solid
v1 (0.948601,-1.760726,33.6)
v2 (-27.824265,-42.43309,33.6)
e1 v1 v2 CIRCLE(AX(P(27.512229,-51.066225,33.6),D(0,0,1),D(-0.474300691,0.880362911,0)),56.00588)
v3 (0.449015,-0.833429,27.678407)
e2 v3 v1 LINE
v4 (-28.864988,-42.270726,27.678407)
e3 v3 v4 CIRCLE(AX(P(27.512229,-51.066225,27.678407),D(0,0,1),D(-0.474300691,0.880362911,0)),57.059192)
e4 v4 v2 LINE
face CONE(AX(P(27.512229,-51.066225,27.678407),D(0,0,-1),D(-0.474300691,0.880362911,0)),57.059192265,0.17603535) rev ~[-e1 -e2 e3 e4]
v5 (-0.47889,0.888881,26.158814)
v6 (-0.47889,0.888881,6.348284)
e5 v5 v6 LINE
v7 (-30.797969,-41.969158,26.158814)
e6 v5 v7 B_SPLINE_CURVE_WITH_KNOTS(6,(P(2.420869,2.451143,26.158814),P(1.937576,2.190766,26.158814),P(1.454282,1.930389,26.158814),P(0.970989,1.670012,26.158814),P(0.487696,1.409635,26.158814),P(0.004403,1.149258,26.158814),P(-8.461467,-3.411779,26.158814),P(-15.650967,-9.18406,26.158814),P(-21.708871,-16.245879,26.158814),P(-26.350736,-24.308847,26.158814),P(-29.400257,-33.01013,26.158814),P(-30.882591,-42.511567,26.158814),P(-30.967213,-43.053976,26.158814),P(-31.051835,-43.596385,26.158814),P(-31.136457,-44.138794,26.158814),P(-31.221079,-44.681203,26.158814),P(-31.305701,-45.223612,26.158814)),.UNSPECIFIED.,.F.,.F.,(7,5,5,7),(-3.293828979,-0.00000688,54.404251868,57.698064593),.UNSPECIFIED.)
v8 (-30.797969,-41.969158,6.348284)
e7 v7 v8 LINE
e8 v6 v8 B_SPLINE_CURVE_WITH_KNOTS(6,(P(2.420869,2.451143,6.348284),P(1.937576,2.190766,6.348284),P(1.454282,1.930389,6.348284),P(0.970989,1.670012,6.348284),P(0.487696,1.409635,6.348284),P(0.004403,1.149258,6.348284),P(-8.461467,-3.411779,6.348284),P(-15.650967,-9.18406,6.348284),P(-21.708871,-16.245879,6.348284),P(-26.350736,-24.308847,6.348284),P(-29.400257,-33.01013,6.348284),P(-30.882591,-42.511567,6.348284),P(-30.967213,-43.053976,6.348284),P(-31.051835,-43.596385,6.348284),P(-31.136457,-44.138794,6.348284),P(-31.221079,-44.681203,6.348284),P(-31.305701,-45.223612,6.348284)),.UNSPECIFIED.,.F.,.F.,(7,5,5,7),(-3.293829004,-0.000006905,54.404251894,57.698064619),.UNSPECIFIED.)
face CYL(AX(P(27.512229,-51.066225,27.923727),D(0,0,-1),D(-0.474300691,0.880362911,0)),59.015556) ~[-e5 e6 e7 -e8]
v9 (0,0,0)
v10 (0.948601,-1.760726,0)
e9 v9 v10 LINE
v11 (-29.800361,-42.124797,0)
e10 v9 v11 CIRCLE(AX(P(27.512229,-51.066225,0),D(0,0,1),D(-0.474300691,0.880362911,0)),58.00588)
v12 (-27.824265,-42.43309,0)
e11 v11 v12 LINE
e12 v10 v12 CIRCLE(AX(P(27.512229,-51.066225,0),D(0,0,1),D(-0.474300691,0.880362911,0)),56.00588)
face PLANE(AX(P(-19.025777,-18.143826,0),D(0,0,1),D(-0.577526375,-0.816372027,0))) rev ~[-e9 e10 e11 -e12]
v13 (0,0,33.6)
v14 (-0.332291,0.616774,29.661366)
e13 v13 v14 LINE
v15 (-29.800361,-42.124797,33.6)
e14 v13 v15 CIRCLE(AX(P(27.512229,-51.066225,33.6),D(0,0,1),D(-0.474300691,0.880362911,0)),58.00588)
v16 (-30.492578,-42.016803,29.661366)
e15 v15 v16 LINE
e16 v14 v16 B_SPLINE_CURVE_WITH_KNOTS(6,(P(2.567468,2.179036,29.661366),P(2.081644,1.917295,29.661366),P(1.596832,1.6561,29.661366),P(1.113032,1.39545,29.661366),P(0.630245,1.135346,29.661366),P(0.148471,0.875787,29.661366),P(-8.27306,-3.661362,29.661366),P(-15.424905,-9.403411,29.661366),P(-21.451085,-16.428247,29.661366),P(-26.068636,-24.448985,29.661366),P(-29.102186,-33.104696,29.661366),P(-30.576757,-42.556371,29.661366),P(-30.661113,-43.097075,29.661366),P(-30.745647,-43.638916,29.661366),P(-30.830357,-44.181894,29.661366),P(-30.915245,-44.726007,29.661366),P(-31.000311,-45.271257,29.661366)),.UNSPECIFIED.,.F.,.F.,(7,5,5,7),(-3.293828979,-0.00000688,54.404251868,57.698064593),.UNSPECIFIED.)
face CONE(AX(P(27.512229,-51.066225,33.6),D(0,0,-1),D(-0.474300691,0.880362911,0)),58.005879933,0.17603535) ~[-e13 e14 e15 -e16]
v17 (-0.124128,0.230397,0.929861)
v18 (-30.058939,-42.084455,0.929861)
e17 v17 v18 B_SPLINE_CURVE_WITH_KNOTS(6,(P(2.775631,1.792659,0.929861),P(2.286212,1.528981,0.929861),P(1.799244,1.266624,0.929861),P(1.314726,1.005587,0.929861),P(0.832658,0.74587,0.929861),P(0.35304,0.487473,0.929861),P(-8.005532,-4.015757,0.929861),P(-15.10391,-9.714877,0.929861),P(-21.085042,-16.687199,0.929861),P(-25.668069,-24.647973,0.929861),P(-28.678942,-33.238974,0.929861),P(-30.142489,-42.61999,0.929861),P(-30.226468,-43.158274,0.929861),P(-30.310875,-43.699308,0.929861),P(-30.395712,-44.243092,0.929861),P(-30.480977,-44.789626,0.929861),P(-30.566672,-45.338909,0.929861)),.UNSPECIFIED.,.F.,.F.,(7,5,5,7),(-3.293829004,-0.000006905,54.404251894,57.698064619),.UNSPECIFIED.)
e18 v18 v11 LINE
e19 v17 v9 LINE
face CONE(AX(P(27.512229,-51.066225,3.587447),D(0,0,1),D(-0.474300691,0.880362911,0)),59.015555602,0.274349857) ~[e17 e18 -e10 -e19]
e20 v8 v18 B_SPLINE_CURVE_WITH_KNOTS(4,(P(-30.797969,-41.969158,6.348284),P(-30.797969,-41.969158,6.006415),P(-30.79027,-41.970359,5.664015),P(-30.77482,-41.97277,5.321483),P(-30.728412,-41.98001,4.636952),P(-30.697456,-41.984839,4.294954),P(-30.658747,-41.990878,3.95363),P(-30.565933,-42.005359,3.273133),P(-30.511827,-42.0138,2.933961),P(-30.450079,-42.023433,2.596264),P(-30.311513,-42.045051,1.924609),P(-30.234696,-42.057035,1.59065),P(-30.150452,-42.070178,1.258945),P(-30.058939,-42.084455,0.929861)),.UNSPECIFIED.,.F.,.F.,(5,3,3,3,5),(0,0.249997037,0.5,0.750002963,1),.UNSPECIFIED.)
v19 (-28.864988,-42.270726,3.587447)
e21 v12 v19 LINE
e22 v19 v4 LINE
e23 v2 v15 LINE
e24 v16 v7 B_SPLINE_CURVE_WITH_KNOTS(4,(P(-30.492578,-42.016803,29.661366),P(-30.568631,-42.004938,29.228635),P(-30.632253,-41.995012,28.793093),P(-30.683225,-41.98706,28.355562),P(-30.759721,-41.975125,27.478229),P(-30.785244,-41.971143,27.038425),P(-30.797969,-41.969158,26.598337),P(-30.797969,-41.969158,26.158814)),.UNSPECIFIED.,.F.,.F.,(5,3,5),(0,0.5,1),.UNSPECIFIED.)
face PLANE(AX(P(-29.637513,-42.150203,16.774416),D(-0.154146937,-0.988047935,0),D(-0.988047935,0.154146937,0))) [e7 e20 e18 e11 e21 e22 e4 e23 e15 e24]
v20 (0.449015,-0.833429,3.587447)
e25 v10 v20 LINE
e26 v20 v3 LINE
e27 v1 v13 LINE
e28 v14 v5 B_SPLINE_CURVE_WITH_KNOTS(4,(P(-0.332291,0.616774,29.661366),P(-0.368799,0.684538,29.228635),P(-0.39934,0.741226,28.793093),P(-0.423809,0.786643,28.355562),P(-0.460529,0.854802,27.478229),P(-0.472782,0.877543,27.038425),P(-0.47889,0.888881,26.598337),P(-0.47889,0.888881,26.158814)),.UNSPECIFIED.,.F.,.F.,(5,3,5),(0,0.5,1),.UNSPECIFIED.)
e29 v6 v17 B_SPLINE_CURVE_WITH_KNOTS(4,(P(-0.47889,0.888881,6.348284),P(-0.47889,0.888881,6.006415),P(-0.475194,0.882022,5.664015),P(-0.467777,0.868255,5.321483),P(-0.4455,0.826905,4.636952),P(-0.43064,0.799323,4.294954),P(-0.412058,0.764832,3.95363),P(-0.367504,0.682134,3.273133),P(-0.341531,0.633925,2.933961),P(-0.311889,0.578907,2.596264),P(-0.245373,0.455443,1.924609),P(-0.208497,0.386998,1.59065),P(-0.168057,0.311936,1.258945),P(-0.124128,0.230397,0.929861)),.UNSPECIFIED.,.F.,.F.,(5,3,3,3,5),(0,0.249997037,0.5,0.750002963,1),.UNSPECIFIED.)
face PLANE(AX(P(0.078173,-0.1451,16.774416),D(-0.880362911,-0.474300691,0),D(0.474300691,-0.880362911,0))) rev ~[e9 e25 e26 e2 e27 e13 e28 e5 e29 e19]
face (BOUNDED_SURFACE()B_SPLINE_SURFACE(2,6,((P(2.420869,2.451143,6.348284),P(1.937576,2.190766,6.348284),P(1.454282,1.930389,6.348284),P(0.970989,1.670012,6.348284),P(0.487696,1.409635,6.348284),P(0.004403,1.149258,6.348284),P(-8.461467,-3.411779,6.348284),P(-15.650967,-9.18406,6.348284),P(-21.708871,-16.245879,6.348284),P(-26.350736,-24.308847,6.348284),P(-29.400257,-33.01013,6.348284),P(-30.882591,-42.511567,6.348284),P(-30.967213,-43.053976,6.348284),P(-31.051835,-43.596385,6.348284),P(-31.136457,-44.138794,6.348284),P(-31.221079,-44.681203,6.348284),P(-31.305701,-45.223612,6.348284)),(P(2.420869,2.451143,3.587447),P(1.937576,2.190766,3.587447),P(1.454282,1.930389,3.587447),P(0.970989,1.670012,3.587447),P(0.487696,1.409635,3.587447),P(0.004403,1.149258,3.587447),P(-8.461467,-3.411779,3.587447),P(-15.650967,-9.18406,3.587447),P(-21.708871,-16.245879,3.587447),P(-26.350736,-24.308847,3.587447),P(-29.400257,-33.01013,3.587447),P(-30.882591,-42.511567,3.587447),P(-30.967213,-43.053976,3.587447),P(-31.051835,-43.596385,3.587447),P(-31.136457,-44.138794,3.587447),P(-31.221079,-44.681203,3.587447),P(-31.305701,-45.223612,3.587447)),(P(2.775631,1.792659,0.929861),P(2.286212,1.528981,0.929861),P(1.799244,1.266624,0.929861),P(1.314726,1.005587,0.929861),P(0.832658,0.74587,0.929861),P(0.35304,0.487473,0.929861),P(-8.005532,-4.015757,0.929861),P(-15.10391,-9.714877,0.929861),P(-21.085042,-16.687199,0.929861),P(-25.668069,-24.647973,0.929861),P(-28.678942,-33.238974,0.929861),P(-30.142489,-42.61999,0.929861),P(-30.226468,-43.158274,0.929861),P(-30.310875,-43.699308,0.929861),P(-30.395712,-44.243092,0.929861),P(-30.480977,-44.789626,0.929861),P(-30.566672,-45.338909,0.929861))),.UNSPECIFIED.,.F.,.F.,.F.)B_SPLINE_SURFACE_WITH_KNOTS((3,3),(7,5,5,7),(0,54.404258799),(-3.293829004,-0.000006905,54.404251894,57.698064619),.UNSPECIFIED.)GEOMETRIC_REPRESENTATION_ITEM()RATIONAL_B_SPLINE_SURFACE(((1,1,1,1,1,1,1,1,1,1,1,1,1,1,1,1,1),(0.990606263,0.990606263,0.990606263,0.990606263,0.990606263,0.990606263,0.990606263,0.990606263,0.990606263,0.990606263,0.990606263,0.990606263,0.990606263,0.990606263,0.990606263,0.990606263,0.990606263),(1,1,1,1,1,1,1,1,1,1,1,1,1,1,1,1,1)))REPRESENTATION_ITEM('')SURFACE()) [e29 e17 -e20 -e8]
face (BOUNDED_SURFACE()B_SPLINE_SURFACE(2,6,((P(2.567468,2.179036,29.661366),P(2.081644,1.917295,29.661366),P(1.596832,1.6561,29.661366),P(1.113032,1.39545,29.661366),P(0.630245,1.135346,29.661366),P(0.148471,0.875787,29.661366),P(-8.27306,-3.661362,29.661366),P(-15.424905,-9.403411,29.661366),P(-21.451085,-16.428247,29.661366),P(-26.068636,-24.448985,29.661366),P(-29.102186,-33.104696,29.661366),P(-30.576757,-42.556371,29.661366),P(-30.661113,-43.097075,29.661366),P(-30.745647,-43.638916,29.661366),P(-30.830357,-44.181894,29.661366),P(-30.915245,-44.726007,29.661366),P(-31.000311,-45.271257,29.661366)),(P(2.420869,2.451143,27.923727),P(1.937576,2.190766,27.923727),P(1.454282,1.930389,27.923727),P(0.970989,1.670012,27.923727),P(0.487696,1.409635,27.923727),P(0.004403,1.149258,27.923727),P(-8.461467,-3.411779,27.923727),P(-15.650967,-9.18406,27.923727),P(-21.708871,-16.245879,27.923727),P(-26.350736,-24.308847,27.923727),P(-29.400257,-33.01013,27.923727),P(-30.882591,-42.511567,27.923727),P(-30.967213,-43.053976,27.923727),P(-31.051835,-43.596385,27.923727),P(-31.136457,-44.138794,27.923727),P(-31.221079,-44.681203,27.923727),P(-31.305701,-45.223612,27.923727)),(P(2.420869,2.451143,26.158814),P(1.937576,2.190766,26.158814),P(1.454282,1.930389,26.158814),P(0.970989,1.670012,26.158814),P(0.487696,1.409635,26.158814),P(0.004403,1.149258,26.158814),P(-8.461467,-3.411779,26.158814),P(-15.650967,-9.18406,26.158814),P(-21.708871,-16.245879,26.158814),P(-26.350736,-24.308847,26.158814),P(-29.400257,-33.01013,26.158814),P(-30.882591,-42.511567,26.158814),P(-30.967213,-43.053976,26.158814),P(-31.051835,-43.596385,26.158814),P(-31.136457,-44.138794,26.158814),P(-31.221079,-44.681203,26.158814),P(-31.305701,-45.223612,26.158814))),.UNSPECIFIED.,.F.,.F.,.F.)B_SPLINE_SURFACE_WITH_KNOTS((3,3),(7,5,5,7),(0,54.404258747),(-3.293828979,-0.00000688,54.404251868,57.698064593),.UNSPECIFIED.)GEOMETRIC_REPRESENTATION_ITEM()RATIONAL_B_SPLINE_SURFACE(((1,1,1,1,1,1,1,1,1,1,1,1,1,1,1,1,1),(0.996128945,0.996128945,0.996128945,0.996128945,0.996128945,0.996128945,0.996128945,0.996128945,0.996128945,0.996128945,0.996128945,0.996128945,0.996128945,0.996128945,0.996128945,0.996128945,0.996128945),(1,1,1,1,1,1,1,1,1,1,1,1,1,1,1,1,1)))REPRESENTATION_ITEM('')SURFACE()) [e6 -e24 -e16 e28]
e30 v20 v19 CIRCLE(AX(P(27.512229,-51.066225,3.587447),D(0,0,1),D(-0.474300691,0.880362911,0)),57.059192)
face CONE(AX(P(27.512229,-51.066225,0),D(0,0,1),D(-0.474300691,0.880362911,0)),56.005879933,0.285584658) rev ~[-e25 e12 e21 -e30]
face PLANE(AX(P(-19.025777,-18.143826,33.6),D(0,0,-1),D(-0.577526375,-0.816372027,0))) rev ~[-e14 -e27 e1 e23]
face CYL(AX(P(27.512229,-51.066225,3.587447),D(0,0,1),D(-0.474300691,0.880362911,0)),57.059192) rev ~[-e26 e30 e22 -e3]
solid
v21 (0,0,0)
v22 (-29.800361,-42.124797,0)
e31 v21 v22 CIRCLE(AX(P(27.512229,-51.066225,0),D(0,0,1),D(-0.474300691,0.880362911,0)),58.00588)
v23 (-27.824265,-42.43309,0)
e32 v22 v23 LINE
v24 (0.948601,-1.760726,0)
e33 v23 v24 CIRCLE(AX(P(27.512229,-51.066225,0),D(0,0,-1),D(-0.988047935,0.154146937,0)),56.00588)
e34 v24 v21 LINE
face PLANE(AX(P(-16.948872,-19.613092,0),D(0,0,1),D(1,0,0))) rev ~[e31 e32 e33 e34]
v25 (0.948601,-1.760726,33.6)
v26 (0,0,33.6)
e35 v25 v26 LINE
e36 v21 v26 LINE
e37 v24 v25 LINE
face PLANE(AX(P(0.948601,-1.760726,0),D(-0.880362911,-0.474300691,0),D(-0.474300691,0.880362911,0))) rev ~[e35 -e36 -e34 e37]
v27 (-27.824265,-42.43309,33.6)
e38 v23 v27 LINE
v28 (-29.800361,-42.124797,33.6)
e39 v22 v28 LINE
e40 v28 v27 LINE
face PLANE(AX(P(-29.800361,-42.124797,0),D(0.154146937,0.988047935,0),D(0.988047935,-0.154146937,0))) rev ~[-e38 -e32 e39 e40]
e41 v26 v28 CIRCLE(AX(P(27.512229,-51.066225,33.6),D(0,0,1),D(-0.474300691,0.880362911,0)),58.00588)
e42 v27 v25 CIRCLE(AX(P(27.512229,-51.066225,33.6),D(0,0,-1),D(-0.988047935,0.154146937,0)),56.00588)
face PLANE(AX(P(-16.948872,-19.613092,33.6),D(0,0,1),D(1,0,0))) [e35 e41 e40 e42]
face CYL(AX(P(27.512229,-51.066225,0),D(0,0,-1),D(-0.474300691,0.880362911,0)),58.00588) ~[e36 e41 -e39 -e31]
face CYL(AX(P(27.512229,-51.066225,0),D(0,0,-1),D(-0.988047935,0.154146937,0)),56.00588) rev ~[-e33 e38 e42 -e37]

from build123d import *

# Parameters (mm, degrees)
F2_DEPTH = 33.6
F5_R     = 20


with BuildPart() as f2:
    # F1 (on Top) → F2 (new body)
    with BuildSketch(Plane.XY):
        with BuildLine():
            Line((0.9486013825, -1.7607258211), (0, 0))
            ThreePointArc((0, 0), (-19.8421488285, -17.5662997323), (-29.80036094, -42.1247965911))
            Line((-29.80036094, -42.1247965911), (-27.8242650699, -42.4330904643))
            ThreePointArc((-27.8242650699, -42.4330904643), (-18.2094047746, -18.721352482), (0.9486013825, -1.7607258211))
        make_face()
    extrude(amount=F2_DEPTH)


with BuildPart() as f4:
    # F4: sweep along a path in F4_path
    with BuildLine(Plane(origin=(0, 0, 33.6), x_dir=(0, -1, 0), z_dir=(0, 0, -1))) as f4_path:
        ThreePointArc((0, 0), (17.5662997323, 19.8421488285), (42.1247965911, 29.80036094))
    # F3 (on face) → F4 (sweep)
    with BuildSketch(Plane(origin=(-7.1238933736, -45.6625885183, 0), x_dir=(0.988047935, -0.1541469366, 0), z_dir=(-0.1541469366, -0.988047935, 0))):
        Polygon((-20.9507767409, 33.6), (-22.9507767409, 33.6), (-22.9507767409, 0), (-20.9507767409, 0), (-22.0040890729, 3.5874471068), (-22.0040890729, 27.6784074476), align=None)
        Polygon((-22.9507767409, 0), (-22.9507767409, 33.6), (-23.9604524097, 27.9237274081), (-23.9604524097, 3.5874471068), align=None)
    sweep(path=f4_path.line)

    # F5
    f5_edges = [f4.edges().sort_by_distance(p)[0] for p in [
        (-20.66642, -16.983185, 27.923727),
        (-20.66642, -16.983185, 3.587447),
    ]]
    fillet(f5_edges, radius=F5_R)


solid = Compound([f2.part, f4.part])
